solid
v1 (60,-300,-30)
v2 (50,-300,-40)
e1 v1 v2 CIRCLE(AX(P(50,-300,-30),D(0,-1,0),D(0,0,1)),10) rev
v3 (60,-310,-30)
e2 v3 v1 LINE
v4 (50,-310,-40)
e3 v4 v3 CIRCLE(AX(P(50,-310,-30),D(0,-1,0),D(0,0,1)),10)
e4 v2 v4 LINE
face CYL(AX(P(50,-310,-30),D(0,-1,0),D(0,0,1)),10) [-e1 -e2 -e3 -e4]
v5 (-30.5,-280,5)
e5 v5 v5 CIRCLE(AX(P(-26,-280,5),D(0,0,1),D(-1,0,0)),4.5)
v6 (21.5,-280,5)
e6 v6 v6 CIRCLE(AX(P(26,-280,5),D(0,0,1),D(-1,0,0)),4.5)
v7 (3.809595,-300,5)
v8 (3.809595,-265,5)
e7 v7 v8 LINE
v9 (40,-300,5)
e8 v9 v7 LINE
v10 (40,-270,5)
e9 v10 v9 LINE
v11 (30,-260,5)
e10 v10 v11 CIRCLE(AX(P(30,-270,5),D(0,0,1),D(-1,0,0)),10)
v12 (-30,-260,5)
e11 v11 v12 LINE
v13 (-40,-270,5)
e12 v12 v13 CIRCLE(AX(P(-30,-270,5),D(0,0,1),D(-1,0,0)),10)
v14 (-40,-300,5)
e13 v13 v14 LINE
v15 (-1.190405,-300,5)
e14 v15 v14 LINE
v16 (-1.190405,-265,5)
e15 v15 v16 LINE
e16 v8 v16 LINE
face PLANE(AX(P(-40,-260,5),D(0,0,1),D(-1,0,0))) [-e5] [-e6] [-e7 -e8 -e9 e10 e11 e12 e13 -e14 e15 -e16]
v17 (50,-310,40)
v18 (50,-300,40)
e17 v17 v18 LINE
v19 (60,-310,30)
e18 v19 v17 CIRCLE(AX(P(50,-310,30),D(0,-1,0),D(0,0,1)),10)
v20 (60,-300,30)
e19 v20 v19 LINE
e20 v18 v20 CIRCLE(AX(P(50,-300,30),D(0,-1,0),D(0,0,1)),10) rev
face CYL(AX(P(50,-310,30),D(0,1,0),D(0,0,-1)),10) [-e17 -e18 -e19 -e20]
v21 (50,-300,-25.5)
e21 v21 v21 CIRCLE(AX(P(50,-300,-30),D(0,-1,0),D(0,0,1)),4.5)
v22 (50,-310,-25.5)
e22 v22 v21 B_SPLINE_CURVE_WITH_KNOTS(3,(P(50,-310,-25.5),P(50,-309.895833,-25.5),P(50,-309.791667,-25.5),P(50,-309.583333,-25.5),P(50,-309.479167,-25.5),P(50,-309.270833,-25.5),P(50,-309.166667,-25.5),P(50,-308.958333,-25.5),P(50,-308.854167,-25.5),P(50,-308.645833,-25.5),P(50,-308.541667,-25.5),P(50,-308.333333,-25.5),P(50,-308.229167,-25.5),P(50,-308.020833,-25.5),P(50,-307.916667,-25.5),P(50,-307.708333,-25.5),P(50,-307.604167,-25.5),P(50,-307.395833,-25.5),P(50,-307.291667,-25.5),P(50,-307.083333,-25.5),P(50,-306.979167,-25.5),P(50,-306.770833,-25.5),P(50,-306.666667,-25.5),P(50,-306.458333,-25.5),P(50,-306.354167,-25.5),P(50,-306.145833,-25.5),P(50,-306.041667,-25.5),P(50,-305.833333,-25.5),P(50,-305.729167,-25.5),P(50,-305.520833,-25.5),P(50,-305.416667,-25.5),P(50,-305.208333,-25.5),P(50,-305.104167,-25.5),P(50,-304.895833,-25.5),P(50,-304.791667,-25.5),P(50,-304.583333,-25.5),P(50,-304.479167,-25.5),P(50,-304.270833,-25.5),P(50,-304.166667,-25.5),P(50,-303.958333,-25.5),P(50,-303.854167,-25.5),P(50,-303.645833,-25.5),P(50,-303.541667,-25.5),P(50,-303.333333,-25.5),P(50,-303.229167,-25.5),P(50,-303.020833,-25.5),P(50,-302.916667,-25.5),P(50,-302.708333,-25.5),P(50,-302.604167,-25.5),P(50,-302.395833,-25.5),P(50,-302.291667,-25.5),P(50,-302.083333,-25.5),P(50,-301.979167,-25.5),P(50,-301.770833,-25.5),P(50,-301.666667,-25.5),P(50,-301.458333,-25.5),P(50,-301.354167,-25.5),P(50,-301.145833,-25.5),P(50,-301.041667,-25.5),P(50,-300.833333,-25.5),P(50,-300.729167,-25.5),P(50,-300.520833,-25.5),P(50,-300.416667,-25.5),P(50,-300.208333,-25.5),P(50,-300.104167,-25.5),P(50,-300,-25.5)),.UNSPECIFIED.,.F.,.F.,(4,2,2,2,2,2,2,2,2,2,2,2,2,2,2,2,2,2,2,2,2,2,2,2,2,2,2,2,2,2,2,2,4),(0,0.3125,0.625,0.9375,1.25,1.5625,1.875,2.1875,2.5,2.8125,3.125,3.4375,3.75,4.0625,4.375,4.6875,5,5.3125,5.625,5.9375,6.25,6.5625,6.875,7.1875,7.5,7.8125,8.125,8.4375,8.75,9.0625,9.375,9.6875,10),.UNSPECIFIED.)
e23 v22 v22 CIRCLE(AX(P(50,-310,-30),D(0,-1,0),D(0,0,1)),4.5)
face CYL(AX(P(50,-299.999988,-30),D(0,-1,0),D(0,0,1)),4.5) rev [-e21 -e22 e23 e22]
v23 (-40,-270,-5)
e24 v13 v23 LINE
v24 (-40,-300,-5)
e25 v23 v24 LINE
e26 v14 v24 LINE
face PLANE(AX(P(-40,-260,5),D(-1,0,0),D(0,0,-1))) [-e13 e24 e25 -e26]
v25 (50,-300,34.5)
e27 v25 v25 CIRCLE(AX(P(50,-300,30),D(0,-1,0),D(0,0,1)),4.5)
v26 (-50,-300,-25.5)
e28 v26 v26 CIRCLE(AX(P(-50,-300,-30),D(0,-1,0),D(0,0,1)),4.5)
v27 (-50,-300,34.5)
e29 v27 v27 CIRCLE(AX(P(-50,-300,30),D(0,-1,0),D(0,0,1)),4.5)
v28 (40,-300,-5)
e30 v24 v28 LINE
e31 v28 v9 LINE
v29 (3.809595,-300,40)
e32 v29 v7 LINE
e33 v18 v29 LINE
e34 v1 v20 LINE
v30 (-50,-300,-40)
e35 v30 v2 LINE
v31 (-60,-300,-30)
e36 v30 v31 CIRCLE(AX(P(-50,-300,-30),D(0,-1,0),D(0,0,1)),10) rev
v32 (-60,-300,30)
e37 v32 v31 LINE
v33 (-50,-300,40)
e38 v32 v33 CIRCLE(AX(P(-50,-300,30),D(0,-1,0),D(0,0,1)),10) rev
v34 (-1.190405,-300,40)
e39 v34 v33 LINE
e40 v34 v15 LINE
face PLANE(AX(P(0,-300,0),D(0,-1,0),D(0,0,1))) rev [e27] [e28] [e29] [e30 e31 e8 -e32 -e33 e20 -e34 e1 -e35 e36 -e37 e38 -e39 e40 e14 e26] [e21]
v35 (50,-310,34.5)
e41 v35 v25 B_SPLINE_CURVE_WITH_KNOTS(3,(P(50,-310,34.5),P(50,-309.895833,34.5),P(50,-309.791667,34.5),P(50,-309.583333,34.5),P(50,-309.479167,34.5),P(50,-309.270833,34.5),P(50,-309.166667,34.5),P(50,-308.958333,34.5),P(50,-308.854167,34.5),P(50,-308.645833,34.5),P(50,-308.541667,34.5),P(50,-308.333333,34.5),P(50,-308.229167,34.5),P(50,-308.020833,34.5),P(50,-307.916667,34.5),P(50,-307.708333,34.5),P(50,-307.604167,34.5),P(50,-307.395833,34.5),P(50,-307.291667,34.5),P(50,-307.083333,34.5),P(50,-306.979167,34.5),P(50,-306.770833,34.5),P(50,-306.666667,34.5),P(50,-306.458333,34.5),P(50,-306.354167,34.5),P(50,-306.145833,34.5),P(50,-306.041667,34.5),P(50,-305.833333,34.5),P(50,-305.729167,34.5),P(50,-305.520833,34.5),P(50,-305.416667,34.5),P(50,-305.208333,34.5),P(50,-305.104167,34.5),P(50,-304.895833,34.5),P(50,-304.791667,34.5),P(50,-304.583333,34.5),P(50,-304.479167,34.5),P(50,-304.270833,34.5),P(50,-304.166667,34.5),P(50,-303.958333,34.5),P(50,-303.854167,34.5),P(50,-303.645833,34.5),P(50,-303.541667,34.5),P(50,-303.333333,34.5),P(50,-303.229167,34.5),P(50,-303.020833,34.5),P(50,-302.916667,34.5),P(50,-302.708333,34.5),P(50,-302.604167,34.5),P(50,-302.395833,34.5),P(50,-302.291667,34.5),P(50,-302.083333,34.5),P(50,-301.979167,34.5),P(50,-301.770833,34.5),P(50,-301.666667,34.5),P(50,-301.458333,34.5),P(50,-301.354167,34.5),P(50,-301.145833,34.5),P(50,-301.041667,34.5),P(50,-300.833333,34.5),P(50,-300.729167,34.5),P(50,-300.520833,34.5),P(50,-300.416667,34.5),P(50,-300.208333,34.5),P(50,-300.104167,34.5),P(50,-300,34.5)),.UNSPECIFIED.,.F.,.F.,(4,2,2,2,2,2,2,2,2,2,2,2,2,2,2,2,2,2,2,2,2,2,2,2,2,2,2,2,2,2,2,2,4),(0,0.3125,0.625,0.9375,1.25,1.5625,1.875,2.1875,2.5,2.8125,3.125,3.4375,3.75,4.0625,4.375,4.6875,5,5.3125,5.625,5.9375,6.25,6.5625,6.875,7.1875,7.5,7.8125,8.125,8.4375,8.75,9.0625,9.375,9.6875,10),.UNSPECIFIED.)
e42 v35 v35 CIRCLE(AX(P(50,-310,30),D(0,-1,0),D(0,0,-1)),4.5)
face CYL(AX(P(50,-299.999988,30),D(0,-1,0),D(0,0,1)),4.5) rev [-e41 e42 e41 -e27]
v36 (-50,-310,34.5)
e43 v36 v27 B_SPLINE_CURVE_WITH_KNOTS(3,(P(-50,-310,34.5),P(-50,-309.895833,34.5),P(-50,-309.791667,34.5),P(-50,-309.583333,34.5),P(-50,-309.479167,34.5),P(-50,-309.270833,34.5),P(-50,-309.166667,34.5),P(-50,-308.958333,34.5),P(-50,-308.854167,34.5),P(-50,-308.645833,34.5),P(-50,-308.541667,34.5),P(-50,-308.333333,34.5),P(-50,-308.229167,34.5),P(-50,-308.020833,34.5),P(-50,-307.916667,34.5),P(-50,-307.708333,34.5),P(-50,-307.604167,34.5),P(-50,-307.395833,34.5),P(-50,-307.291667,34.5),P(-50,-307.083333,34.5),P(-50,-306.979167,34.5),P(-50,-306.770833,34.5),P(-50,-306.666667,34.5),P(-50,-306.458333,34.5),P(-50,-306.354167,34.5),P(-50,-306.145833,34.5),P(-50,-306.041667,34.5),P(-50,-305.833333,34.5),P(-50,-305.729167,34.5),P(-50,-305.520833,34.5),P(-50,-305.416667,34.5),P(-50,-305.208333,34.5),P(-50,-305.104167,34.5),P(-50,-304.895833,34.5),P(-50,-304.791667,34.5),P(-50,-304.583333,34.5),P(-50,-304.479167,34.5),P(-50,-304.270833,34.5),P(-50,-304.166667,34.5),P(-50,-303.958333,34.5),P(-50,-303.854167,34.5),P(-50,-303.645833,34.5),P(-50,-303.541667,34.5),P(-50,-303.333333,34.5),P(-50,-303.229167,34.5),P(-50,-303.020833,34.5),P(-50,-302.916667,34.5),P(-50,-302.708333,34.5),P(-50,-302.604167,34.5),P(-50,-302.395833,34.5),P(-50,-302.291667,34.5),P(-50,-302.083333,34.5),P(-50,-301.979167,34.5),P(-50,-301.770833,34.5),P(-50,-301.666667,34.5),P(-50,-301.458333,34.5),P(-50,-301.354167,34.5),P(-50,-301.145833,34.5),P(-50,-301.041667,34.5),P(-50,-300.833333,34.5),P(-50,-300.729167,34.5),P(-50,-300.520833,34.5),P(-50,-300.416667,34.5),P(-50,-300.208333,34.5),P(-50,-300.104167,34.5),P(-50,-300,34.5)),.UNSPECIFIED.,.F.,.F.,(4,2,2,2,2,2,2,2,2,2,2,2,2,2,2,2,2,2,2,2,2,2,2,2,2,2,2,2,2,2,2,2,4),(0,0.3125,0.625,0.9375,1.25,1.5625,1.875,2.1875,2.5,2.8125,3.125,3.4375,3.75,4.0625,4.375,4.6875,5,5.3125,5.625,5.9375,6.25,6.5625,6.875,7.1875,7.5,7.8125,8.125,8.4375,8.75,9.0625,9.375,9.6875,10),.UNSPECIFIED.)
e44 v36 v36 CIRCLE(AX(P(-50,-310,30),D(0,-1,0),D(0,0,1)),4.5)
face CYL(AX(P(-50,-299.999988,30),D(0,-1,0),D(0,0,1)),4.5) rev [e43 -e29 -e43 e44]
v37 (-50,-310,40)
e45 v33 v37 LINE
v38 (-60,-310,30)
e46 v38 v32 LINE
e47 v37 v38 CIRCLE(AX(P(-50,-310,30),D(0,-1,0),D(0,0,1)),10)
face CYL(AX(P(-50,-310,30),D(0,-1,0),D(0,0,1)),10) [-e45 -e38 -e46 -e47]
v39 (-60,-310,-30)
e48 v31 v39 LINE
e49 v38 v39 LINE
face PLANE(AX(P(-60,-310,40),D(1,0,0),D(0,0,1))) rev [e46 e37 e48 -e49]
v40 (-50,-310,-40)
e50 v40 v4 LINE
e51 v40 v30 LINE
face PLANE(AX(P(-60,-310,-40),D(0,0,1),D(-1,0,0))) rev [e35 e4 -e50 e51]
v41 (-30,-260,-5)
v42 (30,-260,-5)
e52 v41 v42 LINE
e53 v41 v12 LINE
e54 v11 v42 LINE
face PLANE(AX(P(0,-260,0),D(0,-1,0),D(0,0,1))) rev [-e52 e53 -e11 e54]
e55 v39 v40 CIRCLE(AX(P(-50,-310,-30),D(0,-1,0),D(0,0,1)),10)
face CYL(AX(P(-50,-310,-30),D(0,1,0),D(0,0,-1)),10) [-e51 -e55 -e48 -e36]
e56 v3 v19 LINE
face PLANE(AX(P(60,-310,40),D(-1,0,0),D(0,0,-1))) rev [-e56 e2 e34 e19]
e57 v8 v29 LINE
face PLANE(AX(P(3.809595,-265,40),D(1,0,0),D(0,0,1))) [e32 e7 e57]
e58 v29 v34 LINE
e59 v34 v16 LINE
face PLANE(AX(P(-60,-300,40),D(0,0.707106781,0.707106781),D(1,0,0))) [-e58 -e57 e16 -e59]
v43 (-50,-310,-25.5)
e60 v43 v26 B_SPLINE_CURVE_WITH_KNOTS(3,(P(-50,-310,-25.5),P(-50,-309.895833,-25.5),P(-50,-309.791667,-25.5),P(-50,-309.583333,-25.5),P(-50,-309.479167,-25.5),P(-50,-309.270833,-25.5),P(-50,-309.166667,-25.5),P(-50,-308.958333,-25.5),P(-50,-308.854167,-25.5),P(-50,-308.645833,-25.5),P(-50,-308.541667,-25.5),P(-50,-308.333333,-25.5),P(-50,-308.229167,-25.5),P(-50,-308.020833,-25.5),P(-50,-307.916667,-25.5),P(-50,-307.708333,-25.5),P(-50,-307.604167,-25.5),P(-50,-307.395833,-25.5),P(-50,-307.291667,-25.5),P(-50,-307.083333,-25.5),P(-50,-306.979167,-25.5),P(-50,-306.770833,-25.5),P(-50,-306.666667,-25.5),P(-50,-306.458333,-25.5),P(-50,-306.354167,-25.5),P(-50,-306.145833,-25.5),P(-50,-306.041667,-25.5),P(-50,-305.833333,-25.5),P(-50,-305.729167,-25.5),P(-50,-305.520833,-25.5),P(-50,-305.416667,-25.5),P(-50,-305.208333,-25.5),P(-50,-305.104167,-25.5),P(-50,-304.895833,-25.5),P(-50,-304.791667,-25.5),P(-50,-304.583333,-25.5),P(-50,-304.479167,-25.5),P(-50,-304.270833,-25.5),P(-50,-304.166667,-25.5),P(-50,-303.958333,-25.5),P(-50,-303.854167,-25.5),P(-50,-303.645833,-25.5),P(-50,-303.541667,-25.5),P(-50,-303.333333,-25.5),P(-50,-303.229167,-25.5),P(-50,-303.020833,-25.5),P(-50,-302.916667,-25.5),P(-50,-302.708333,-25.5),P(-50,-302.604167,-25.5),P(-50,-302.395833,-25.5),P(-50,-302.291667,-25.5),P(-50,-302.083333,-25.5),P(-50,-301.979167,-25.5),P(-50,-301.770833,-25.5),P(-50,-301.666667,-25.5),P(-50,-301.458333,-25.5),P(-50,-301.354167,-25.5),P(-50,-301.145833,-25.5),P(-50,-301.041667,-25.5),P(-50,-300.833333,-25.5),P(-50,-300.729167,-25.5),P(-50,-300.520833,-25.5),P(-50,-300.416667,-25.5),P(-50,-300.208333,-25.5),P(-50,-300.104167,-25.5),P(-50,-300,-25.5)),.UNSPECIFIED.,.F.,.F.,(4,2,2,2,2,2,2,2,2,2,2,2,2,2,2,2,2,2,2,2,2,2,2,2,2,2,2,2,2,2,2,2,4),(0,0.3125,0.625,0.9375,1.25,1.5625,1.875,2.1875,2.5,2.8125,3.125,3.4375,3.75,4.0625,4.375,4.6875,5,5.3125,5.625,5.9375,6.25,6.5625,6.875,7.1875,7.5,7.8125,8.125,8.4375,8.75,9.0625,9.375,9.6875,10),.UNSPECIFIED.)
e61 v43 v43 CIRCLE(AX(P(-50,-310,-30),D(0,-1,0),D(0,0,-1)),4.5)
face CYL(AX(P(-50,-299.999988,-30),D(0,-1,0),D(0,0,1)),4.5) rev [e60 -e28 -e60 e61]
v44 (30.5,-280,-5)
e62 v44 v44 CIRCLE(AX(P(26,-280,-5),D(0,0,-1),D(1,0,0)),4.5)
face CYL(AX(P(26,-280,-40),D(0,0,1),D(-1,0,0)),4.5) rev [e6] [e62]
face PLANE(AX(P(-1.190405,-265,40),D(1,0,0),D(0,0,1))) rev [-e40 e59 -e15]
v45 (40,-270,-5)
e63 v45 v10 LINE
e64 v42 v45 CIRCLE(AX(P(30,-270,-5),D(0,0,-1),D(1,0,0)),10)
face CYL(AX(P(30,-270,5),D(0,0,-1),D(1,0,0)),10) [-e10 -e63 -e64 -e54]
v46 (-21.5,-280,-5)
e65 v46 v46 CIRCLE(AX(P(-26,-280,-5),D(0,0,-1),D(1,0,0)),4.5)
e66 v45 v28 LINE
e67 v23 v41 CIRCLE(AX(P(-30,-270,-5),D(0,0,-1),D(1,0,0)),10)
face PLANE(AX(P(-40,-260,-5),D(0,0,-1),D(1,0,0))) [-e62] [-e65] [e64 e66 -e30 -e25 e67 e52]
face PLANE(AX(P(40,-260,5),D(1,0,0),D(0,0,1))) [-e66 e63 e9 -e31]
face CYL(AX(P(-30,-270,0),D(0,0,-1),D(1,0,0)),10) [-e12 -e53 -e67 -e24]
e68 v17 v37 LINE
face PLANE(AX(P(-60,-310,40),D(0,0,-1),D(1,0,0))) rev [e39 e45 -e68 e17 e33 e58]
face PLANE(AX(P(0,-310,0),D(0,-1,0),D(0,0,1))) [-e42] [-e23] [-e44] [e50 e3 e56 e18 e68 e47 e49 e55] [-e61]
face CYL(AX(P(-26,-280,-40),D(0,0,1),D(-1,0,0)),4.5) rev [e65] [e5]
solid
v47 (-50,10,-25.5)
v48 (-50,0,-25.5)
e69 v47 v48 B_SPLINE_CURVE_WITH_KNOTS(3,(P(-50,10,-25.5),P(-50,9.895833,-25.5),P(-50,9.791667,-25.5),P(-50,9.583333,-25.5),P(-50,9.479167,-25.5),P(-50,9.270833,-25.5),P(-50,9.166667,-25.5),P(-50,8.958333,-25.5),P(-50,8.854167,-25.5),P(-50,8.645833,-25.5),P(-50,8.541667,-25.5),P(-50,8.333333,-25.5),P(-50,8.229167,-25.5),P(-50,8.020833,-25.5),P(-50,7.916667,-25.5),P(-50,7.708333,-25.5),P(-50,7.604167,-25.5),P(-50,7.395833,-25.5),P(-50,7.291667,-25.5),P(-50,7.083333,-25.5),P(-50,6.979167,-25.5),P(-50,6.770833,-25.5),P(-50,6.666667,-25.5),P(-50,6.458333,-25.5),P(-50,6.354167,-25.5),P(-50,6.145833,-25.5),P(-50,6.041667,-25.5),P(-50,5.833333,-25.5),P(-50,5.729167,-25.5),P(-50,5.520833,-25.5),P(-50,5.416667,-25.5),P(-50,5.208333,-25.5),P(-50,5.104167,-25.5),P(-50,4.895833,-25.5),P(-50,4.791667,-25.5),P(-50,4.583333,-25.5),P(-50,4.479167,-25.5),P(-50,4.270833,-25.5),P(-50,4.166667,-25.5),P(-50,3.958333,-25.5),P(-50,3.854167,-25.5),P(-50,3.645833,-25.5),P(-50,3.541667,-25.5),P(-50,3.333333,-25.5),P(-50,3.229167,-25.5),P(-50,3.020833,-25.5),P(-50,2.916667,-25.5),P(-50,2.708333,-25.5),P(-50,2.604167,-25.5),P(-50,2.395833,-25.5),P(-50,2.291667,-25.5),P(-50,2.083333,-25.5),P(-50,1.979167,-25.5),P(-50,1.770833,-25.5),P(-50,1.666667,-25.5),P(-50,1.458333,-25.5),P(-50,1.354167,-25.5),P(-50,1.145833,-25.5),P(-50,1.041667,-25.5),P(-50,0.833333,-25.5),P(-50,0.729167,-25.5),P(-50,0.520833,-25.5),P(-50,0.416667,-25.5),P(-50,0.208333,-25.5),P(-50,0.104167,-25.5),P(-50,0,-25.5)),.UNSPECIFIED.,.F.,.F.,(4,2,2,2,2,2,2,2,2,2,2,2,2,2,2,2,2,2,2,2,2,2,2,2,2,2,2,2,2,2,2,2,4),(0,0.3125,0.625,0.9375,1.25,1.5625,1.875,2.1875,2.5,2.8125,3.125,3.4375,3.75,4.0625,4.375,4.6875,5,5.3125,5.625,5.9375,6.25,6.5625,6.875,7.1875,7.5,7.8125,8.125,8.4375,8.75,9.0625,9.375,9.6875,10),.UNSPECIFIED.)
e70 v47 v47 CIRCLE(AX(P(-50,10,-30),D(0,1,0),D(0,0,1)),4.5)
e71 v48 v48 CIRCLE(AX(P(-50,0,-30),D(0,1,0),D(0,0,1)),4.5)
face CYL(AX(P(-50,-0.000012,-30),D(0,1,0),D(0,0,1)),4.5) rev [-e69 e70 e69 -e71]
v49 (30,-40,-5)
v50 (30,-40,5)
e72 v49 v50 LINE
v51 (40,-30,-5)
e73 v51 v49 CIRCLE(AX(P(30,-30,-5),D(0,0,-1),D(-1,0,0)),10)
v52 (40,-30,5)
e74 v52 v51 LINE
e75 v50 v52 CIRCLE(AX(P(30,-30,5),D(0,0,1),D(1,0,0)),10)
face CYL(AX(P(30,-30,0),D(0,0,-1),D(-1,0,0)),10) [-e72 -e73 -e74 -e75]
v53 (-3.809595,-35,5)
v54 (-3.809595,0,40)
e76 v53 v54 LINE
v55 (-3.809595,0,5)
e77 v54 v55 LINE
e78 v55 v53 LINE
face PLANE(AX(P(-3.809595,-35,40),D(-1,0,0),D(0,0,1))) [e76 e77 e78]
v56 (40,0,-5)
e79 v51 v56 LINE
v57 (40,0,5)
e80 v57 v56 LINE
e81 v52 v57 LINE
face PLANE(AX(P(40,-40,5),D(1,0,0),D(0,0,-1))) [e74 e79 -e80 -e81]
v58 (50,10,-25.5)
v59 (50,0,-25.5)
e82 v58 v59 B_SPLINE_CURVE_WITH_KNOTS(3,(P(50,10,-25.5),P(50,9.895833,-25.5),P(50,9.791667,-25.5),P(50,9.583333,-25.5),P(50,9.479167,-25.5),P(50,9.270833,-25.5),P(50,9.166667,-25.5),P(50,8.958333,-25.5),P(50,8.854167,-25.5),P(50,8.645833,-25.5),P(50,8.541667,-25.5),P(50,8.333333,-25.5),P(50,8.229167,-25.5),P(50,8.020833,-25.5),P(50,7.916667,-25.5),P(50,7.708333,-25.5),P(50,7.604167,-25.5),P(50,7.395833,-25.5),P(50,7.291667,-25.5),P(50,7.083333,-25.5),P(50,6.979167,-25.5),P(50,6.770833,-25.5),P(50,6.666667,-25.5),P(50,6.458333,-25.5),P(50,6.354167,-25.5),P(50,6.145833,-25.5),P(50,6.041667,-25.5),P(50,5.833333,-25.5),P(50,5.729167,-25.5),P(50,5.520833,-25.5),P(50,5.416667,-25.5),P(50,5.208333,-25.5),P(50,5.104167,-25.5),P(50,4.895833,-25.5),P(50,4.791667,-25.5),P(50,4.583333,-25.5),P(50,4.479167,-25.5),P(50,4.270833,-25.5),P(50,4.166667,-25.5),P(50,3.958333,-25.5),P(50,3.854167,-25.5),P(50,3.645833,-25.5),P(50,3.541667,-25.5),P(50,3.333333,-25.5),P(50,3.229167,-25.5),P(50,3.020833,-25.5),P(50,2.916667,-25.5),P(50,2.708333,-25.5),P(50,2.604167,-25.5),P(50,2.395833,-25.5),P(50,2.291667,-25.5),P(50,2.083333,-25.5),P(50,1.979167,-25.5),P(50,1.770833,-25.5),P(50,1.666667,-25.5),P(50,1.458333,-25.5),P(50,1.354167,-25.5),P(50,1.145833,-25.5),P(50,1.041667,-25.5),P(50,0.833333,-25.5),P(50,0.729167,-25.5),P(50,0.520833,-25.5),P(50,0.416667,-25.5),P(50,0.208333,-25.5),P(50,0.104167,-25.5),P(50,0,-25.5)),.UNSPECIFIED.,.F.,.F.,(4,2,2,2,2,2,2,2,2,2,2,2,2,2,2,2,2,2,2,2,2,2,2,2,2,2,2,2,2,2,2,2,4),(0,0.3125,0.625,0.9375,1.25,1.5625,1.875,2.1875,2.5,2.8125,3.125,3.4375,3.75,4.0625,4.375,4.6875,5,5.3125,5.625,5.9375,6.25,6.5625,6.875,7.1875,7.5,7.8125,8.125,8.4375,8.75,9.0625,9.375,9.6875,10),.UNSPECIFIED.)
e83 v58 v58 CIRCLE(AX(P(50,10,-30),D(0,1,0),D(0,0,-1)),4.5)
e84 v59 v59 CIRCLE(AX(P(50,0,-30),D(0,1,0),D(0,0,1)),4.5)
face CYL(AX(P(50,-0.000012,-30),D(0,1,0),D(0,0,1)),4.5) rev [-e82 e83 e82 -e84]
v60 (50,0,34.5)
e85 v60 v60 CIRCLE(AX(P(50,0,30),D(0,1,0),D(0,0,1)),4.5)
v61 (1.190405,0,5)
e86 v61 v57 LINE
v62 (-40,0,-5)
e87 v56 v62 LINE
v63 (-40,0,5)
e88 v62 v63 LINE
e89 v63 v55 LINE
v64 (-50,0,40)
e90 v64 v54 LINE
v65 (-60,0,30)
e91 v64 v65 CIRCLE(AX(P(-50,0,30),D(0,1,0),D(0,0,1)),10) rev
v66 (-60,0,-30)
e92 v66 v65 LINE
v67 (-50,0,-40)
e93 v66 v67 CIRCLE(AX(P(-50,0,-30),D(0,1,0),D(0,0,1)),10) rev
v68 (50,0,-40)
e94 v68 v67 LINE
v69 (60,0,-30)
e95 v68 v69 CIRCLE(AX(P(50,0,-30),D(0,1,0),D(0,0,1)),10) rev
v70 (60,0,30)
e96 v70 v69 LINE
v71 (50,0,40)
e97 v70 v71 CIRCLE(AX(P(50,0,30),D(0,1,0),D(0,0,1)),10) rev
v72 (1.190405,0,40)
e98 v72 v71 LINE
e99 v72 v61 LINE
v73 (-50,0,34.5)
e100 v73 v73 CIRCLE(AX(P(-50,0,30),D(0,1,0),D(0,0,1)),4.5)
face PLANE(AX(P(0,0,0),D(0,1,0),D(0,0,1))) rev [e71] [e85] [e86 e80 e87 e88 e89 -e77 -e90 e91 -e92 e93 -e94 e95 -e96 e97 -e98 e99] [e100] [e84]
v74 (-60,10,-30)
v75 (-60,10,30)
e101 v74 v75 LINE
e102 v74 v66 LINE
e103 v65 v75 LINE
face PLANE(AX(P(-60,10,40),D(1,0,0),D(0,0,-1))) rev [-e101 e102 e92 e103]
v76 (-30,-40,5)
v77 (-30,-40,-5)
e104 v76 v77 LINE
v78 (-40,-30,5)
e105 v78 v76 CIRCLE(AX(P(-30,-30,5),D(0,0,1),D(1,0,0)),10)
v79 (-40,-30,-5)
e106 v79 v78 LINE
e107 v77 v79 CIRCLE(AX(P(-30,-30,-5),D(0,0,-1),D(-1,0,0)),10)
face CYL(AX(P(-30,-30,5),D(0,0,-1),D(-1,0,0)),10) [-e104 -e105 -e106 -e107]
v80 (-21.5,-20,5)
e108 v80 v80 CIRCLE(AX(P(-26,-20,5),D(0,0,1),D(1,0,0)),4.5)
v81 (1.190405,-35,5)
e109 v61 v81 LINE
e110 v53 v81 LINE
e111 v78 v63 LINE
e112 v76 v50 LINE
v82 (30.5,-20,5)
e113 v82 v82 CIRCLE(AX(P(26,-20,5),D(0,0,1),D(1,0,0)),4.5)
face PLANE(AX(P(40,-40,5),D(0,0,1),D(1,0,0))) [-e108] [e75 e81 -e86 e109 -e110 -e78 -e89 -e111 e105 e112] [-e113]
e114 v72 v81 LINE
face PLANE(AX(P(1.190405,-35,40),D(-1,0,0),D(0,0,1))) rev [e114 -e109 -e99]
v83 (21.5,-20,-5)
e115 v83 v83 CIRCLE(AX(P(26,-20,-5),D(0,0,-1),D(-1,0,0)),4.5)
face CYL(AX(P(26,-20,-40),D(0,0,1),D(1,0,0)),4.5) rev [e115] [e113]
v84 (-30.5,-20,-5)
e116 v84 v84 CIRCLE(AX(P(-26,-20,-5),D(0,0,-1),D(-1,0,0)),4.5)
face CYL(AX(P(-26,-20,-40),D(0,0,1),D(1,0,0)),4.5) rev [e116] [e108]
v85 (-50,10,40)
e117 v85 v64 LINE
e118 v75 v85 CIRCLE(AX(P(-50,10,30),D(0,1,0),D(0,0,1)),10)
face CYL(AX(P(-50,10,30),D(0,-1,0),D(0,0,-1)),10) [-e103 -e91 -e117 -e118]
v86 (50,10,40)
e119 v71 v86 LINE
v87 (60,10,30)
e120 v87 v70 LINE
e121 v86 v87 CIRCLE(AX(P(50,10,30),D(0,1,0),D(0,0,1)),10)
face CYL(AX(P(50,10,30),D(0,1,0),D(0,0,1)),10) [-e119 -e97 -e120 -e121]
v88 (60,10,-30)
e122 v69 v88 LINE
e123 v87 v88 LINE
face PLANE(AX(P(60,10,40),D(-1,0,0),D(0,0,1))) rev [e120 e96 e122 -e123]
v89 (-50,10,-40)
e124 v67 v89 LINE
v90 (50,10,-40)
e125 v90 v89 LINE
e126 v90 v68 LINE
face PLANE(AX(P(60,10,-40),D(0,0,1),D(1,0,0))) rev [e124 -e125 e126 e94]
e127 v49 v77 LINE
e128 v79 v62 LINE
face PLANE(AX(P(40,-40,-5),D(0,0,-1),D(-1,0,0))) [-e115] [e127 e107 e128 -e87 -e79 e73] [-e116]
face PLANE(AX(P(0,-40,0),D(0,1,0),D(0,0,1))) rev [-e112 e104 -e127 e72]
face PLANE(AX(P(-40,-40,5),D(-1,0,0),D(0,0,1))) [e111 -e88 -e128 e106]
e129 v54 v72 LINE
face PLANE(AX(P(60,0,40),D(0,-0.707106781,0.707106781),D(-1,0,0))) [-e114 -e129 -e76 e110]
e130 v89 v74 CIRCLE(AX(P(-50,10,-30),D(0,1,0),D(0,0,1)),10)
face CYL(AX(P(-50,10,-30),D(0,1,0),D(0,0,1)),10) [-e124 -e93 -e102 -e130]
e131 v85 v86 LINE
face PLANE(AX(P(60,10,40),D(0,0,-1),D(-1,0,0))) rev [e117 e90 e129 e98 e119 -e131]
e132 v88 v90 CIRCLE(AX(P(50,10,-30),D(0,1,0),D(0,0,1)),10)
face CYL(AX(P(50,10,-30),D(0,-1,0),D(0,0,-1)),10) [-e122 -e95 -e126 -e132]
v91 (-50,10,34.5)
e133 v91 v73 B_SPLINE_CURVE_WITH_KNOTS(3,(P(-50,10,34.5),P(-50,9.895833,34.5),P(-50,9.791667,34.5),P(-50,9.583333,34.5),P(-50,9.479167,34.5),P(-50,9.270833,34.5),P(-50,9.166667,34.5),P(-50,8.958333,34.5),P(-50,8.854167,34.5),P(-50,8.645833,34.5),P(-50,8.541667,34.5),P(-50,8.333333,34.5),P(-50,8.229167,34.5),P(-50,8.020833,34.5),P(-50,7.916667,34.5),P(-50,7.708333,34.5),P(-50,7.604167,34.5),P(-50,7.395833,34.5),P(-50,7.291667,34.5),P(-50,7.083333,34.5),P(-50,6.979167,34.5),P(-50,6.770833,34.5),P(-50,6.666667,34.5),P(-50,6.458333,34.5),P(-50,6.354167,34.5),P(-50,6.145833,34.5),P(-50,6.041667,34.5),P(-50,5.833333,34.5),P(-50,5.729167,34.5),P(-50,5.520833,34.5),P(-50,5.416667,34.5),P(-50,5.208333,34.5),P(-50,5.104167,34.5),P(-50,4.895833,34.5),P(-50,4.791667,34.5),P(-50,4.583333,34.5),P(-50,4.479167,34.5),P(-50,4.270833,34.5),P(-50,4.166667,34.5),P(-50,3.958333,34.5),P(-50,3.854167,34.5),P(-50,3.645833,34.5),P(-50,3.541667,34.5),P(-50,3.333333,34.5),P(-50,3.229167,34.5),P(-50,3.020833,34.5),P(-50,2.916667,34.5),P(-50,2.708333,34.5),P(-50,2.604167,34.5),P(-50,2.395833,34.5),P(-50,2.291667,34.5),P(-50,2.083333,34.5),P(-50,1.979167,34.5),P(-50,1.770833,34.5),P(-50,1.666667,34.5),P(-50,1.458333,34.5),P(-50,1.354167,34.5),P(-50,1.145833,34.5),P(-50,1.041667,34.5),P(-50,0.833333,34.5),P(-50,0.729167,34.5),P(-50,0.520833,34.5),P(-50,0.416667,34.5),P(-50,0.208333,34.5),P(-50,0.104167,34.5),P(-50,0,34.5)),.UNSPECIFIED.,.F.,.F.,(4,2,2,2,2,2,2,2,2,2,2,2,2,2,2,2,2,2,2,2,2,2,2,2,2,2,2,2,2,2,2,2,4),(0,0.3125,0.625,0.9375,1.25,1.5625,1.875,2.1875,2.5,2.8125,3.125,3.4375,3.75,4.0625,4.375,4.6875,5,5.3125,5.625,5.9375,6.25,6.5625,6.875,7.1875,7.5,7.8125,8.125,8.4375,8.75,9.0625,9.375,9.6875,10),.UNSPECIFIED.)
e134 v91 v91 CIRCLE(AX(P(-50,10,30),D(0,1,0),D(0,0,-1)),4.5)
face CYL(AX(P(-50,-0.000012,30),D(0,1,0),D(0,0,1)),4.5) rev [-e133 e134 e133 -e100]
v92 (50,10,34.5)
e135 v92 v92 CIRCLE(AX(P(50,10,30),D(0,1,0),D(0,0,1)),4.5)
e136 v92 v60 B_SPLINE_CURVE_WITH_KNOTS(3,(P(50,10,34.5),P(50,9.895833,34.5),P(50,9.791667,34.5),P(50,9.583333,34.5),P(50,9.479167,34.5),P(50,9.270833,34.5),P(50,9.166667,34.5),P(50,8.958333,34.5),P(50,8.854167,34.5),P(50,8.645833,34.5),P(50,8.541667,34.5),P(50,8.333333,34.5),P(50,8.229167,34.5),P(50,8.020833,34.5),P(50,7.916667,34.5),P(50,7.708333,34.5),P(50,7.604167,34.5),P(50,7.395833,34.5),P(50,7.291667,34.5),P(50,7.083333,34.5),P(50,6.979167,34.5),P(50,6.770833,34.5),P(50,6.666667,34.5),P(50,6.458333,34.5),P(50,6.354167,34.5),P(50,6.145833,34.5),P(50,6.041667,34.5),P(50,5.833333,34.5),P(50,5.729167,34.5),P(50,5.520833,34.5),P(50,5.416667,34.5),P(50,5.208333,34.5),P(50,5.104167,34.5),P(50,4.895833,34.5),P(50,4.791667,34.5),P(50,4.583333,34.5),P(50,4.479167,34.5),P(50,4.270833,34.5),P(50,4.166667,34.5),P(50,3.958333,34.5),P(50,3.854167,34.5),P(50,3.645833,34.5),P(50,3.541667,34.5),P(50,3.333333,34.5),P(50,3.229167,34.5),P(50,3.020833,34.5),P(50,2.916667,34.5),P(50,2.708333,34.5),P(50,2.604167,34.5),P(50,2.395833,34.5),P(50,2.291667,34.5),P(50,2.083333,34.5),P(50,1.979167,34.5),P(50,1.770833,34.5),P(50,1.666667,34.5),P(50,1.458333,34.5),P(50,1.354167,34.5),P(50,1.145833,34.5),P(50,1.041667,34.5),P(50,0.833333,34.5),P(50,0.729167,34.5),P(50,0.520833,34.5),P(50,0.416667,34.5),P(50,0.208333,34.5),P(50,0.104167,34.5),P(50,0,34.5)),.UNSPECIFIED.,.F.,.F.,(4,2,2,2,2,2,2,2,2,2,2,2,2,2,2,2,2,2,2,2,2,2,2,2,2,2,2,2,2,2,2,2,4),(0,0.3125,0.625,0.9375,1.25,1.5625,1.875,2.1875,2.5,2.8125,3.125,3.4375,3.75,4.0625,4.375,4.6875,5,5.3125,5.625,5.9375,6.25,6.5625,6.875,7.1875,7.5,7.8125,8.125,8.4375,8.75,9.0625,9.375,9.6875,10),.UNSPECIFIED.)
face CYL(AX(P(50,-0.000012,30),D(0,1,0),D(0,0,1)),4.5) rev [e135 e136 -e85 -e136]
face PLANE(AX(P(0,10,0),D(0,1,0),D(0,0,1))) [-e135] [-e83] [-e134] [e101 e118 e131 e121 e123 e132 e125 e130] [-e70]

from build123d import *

# Parameters (mm, degrees)
SKETCH1_W               = 120
SKETCH1_H               = 80
BOSS_EXTRUDE1_DEPTH     = 10
FILLET1_R               = 10
FILLET2_R               = 10
FILLET3_R               = 10
FILLET4_R               = 10
CUT_EXTRUDE1_DEPTH      = 73.801098893
CUT_EXTRUDE1_DEPTH_BACK = 73.801098893
SKETCH2_R               = 4.5
SKETCH3_W               = 80
SKETCH3_H               = 10
BOSS_EXTRUDE2_DEPTH     = 40
FILLET5_R               = 10
FILLET6_R               = 10
CUT_EXTRUDE2_DEPTH      = 83.462112512
CUT_EXTRUDE2_DEPTH_BACK = 83.462112512
SKETCH4_R               = 4.5
CUT_EXTRUDE3_DEPTH      = 83.462112512
CUT_EXTRUDE3_DEPTH_BACK = 83.462112512
SKETCH9_R               = 4.5
SKETCH10_W              = 5
SKETCH10_H              = 35
BOSS_EXTRUDE4_DEPTH     = 40
CHAMFER10_START         = -54
CHAMFER10_OUTLINE_W     = 5
CHAMFER10_OUTLINE_H     = 49.497474683
CHAMFER10_DEPTH         = 25.715728753
BODY_MOVE_COPY4_ANGLE   = 180


with BuildPart() as part:
    # Sketch1 → Boss-Extrude1 (new body)
    with BuildSketch(Plane(origin=(0, 0, 0), x_dir=(1, 0, 0), z_dir=(0, 1, 0))):
        Rectangle(SKETCH1_W, SKETCH1_H)
    extrude(amount=BOSS_EXTRUDE1_DEPTH)

    # Fillet1
    fillet1_edges = [part.edges().sort_by_distance(p)[0] for p in [
        (60, 5, 40),
    ]]
    fillet(fillet1_edges, radius=FILLET1_R)

    # Fillet2
    fillet2_edges = [part.edges().sort_by_distance(p)[0] for p in [
        (-60, 5, 40),
    ]]
    fillet(fillet2_edges, radius=FILLET2_R)

    # Fillet3
    fillet3_edges = [part.edges().sort_by_distance(p)[0] for p in [
        (-60, 5, -40),
    ]]
    fillet(fillet3_edges, radius=FILLET3_R)

    # Fillet4
    fillet4_edges = [part.edges().sort_by_distance(p)[0] for p in [
        (60, 5, -40),
    ]]
    fillet(fillet4_edges, radius=FILLET4_R)

    # Sketch2 → Cut-Extrude1 (cut, two sides: drawn at the far end of the back side and taken through both)
    with BuildSketch(Plane(origin=(0, 0, 0), x_dir=(1, 0, 0), z_dir=(0, 1, 0)).offset(-CUT_EXTRUDE1_DEPTH_BACK)):
        with Locations(Location((-50, 30, 0), (0, 0, 270))):
            Circle(SKETCH2_R)
        with Locations(Location((-50, -30, 0), (0, 0, 270))):
            Circle(SKETCH2_R)
        with Locations(Location((50, -30, 0), (0, 0, 270))):
            Circle(SKETCH2_R)
        with Locations(Location((50, 30, 0), (0, 0, 270))):
            Circle(SKETCH2_R)
    extrude(amount=CUT_EXTRUDE1_DEPTH + CUT_EXTRUDE1_DEPTH_BACK, mode=Mode.SUBTRACT)

    # Sketch3 → Boss-Extrude2 (add)
    with BuildSketch(Plane(origin=(0, 0, 0), x_dir=(1, 0, 0), z_dir=(0, 1, 0))):
        Rectangle(SKETCH3_W, SKETCH3_H)
    extrude(amount=-BOSS_EXTRUDE2_DEPTH)

    # Fillet5
    fillet5_edges = [part.edges().sort_by_distance(p)[0] for p in [
        (-40, -40, 0),
    ]]
    fillet(fillet5_edges, radius=FILLET5_R)

    # Fillet6
    fillet6_edges = [part.edges().sort_by_distance(p)[0] for p in [
        (40, -40, 0),
    ]]
    fillet(fillet6_edges, radius=FILLET6_R)

    # Sketch4 → Cut-Extrude2 (cut, two sides: drawn at the far end of the back side and taken through both)
    with BuildSketch(Plane.XY.offset(-CUT_EXTRUDE2_DEPTH_BACK)):
        with Locations((-26, -20)):
            Circle(SKETCH4_R)
    extrude(amount=CUT_EXTRUDE2_DEPTH + CUT_EXTRUDE2_DEPTH_BACK, mode=Mode.SUBTRACT)

    # Sketch9 → Cut-Extrude3 (cut, two sides: drawn at the far end of the back side and taken through both)
    with BuildSketch(Plane.XY.offset(-CUT_EXTRUDE3_DEPTH_BACK)):
        with Locations((26, -20)):
            Circle(SKETCH9_R)
    extrude(amount=CUT_EXTRUDE3_DEPTH + CUT_EXTRUDE3_DEPTH_BACK, mode=Mode.SUBTRACT)

    # Sketch10 → Boss-Extrude4 (add)
    with BuildSketch(Plane.XY):
        with Locations((-1.309595444, -17.5)):
            Rectangle(SKETCH10_W, SKETCH10_H)
    extrude(amount=BOSS_EXTRUDE4_DEPTH)

    # Chamfer10: read off the stored shape, not the designer's step
    # Chamfer10 outline → Chamfer10 (cut)
    with BuildSketch(Plane(origin=(0, 0, 0), x_dir=(1, 0, 0), z_dir=(0, 0.7071067811865476, -0.7071067811865476)).offset(CHAMFER10_START)):
        with Locations((-1.309595444, -3.535533906)):
            Rectangle(CHAMFER10_OUTLINE_W, CHAMFER10_OUTLINE_H)
    extrude(amount=CHAMFER10_DEPTH, mode=Mode.SUBTRACT)


with BuildPart() as body_2:
    # Body-Move/Copy4: copy of part
    add(part.part.rotate(Axis((0, -150, 0), (0, 0, 1)), BODY_MOVE_COPY4_ANGLE))


solid = Compound([part.part, body_2.part])
